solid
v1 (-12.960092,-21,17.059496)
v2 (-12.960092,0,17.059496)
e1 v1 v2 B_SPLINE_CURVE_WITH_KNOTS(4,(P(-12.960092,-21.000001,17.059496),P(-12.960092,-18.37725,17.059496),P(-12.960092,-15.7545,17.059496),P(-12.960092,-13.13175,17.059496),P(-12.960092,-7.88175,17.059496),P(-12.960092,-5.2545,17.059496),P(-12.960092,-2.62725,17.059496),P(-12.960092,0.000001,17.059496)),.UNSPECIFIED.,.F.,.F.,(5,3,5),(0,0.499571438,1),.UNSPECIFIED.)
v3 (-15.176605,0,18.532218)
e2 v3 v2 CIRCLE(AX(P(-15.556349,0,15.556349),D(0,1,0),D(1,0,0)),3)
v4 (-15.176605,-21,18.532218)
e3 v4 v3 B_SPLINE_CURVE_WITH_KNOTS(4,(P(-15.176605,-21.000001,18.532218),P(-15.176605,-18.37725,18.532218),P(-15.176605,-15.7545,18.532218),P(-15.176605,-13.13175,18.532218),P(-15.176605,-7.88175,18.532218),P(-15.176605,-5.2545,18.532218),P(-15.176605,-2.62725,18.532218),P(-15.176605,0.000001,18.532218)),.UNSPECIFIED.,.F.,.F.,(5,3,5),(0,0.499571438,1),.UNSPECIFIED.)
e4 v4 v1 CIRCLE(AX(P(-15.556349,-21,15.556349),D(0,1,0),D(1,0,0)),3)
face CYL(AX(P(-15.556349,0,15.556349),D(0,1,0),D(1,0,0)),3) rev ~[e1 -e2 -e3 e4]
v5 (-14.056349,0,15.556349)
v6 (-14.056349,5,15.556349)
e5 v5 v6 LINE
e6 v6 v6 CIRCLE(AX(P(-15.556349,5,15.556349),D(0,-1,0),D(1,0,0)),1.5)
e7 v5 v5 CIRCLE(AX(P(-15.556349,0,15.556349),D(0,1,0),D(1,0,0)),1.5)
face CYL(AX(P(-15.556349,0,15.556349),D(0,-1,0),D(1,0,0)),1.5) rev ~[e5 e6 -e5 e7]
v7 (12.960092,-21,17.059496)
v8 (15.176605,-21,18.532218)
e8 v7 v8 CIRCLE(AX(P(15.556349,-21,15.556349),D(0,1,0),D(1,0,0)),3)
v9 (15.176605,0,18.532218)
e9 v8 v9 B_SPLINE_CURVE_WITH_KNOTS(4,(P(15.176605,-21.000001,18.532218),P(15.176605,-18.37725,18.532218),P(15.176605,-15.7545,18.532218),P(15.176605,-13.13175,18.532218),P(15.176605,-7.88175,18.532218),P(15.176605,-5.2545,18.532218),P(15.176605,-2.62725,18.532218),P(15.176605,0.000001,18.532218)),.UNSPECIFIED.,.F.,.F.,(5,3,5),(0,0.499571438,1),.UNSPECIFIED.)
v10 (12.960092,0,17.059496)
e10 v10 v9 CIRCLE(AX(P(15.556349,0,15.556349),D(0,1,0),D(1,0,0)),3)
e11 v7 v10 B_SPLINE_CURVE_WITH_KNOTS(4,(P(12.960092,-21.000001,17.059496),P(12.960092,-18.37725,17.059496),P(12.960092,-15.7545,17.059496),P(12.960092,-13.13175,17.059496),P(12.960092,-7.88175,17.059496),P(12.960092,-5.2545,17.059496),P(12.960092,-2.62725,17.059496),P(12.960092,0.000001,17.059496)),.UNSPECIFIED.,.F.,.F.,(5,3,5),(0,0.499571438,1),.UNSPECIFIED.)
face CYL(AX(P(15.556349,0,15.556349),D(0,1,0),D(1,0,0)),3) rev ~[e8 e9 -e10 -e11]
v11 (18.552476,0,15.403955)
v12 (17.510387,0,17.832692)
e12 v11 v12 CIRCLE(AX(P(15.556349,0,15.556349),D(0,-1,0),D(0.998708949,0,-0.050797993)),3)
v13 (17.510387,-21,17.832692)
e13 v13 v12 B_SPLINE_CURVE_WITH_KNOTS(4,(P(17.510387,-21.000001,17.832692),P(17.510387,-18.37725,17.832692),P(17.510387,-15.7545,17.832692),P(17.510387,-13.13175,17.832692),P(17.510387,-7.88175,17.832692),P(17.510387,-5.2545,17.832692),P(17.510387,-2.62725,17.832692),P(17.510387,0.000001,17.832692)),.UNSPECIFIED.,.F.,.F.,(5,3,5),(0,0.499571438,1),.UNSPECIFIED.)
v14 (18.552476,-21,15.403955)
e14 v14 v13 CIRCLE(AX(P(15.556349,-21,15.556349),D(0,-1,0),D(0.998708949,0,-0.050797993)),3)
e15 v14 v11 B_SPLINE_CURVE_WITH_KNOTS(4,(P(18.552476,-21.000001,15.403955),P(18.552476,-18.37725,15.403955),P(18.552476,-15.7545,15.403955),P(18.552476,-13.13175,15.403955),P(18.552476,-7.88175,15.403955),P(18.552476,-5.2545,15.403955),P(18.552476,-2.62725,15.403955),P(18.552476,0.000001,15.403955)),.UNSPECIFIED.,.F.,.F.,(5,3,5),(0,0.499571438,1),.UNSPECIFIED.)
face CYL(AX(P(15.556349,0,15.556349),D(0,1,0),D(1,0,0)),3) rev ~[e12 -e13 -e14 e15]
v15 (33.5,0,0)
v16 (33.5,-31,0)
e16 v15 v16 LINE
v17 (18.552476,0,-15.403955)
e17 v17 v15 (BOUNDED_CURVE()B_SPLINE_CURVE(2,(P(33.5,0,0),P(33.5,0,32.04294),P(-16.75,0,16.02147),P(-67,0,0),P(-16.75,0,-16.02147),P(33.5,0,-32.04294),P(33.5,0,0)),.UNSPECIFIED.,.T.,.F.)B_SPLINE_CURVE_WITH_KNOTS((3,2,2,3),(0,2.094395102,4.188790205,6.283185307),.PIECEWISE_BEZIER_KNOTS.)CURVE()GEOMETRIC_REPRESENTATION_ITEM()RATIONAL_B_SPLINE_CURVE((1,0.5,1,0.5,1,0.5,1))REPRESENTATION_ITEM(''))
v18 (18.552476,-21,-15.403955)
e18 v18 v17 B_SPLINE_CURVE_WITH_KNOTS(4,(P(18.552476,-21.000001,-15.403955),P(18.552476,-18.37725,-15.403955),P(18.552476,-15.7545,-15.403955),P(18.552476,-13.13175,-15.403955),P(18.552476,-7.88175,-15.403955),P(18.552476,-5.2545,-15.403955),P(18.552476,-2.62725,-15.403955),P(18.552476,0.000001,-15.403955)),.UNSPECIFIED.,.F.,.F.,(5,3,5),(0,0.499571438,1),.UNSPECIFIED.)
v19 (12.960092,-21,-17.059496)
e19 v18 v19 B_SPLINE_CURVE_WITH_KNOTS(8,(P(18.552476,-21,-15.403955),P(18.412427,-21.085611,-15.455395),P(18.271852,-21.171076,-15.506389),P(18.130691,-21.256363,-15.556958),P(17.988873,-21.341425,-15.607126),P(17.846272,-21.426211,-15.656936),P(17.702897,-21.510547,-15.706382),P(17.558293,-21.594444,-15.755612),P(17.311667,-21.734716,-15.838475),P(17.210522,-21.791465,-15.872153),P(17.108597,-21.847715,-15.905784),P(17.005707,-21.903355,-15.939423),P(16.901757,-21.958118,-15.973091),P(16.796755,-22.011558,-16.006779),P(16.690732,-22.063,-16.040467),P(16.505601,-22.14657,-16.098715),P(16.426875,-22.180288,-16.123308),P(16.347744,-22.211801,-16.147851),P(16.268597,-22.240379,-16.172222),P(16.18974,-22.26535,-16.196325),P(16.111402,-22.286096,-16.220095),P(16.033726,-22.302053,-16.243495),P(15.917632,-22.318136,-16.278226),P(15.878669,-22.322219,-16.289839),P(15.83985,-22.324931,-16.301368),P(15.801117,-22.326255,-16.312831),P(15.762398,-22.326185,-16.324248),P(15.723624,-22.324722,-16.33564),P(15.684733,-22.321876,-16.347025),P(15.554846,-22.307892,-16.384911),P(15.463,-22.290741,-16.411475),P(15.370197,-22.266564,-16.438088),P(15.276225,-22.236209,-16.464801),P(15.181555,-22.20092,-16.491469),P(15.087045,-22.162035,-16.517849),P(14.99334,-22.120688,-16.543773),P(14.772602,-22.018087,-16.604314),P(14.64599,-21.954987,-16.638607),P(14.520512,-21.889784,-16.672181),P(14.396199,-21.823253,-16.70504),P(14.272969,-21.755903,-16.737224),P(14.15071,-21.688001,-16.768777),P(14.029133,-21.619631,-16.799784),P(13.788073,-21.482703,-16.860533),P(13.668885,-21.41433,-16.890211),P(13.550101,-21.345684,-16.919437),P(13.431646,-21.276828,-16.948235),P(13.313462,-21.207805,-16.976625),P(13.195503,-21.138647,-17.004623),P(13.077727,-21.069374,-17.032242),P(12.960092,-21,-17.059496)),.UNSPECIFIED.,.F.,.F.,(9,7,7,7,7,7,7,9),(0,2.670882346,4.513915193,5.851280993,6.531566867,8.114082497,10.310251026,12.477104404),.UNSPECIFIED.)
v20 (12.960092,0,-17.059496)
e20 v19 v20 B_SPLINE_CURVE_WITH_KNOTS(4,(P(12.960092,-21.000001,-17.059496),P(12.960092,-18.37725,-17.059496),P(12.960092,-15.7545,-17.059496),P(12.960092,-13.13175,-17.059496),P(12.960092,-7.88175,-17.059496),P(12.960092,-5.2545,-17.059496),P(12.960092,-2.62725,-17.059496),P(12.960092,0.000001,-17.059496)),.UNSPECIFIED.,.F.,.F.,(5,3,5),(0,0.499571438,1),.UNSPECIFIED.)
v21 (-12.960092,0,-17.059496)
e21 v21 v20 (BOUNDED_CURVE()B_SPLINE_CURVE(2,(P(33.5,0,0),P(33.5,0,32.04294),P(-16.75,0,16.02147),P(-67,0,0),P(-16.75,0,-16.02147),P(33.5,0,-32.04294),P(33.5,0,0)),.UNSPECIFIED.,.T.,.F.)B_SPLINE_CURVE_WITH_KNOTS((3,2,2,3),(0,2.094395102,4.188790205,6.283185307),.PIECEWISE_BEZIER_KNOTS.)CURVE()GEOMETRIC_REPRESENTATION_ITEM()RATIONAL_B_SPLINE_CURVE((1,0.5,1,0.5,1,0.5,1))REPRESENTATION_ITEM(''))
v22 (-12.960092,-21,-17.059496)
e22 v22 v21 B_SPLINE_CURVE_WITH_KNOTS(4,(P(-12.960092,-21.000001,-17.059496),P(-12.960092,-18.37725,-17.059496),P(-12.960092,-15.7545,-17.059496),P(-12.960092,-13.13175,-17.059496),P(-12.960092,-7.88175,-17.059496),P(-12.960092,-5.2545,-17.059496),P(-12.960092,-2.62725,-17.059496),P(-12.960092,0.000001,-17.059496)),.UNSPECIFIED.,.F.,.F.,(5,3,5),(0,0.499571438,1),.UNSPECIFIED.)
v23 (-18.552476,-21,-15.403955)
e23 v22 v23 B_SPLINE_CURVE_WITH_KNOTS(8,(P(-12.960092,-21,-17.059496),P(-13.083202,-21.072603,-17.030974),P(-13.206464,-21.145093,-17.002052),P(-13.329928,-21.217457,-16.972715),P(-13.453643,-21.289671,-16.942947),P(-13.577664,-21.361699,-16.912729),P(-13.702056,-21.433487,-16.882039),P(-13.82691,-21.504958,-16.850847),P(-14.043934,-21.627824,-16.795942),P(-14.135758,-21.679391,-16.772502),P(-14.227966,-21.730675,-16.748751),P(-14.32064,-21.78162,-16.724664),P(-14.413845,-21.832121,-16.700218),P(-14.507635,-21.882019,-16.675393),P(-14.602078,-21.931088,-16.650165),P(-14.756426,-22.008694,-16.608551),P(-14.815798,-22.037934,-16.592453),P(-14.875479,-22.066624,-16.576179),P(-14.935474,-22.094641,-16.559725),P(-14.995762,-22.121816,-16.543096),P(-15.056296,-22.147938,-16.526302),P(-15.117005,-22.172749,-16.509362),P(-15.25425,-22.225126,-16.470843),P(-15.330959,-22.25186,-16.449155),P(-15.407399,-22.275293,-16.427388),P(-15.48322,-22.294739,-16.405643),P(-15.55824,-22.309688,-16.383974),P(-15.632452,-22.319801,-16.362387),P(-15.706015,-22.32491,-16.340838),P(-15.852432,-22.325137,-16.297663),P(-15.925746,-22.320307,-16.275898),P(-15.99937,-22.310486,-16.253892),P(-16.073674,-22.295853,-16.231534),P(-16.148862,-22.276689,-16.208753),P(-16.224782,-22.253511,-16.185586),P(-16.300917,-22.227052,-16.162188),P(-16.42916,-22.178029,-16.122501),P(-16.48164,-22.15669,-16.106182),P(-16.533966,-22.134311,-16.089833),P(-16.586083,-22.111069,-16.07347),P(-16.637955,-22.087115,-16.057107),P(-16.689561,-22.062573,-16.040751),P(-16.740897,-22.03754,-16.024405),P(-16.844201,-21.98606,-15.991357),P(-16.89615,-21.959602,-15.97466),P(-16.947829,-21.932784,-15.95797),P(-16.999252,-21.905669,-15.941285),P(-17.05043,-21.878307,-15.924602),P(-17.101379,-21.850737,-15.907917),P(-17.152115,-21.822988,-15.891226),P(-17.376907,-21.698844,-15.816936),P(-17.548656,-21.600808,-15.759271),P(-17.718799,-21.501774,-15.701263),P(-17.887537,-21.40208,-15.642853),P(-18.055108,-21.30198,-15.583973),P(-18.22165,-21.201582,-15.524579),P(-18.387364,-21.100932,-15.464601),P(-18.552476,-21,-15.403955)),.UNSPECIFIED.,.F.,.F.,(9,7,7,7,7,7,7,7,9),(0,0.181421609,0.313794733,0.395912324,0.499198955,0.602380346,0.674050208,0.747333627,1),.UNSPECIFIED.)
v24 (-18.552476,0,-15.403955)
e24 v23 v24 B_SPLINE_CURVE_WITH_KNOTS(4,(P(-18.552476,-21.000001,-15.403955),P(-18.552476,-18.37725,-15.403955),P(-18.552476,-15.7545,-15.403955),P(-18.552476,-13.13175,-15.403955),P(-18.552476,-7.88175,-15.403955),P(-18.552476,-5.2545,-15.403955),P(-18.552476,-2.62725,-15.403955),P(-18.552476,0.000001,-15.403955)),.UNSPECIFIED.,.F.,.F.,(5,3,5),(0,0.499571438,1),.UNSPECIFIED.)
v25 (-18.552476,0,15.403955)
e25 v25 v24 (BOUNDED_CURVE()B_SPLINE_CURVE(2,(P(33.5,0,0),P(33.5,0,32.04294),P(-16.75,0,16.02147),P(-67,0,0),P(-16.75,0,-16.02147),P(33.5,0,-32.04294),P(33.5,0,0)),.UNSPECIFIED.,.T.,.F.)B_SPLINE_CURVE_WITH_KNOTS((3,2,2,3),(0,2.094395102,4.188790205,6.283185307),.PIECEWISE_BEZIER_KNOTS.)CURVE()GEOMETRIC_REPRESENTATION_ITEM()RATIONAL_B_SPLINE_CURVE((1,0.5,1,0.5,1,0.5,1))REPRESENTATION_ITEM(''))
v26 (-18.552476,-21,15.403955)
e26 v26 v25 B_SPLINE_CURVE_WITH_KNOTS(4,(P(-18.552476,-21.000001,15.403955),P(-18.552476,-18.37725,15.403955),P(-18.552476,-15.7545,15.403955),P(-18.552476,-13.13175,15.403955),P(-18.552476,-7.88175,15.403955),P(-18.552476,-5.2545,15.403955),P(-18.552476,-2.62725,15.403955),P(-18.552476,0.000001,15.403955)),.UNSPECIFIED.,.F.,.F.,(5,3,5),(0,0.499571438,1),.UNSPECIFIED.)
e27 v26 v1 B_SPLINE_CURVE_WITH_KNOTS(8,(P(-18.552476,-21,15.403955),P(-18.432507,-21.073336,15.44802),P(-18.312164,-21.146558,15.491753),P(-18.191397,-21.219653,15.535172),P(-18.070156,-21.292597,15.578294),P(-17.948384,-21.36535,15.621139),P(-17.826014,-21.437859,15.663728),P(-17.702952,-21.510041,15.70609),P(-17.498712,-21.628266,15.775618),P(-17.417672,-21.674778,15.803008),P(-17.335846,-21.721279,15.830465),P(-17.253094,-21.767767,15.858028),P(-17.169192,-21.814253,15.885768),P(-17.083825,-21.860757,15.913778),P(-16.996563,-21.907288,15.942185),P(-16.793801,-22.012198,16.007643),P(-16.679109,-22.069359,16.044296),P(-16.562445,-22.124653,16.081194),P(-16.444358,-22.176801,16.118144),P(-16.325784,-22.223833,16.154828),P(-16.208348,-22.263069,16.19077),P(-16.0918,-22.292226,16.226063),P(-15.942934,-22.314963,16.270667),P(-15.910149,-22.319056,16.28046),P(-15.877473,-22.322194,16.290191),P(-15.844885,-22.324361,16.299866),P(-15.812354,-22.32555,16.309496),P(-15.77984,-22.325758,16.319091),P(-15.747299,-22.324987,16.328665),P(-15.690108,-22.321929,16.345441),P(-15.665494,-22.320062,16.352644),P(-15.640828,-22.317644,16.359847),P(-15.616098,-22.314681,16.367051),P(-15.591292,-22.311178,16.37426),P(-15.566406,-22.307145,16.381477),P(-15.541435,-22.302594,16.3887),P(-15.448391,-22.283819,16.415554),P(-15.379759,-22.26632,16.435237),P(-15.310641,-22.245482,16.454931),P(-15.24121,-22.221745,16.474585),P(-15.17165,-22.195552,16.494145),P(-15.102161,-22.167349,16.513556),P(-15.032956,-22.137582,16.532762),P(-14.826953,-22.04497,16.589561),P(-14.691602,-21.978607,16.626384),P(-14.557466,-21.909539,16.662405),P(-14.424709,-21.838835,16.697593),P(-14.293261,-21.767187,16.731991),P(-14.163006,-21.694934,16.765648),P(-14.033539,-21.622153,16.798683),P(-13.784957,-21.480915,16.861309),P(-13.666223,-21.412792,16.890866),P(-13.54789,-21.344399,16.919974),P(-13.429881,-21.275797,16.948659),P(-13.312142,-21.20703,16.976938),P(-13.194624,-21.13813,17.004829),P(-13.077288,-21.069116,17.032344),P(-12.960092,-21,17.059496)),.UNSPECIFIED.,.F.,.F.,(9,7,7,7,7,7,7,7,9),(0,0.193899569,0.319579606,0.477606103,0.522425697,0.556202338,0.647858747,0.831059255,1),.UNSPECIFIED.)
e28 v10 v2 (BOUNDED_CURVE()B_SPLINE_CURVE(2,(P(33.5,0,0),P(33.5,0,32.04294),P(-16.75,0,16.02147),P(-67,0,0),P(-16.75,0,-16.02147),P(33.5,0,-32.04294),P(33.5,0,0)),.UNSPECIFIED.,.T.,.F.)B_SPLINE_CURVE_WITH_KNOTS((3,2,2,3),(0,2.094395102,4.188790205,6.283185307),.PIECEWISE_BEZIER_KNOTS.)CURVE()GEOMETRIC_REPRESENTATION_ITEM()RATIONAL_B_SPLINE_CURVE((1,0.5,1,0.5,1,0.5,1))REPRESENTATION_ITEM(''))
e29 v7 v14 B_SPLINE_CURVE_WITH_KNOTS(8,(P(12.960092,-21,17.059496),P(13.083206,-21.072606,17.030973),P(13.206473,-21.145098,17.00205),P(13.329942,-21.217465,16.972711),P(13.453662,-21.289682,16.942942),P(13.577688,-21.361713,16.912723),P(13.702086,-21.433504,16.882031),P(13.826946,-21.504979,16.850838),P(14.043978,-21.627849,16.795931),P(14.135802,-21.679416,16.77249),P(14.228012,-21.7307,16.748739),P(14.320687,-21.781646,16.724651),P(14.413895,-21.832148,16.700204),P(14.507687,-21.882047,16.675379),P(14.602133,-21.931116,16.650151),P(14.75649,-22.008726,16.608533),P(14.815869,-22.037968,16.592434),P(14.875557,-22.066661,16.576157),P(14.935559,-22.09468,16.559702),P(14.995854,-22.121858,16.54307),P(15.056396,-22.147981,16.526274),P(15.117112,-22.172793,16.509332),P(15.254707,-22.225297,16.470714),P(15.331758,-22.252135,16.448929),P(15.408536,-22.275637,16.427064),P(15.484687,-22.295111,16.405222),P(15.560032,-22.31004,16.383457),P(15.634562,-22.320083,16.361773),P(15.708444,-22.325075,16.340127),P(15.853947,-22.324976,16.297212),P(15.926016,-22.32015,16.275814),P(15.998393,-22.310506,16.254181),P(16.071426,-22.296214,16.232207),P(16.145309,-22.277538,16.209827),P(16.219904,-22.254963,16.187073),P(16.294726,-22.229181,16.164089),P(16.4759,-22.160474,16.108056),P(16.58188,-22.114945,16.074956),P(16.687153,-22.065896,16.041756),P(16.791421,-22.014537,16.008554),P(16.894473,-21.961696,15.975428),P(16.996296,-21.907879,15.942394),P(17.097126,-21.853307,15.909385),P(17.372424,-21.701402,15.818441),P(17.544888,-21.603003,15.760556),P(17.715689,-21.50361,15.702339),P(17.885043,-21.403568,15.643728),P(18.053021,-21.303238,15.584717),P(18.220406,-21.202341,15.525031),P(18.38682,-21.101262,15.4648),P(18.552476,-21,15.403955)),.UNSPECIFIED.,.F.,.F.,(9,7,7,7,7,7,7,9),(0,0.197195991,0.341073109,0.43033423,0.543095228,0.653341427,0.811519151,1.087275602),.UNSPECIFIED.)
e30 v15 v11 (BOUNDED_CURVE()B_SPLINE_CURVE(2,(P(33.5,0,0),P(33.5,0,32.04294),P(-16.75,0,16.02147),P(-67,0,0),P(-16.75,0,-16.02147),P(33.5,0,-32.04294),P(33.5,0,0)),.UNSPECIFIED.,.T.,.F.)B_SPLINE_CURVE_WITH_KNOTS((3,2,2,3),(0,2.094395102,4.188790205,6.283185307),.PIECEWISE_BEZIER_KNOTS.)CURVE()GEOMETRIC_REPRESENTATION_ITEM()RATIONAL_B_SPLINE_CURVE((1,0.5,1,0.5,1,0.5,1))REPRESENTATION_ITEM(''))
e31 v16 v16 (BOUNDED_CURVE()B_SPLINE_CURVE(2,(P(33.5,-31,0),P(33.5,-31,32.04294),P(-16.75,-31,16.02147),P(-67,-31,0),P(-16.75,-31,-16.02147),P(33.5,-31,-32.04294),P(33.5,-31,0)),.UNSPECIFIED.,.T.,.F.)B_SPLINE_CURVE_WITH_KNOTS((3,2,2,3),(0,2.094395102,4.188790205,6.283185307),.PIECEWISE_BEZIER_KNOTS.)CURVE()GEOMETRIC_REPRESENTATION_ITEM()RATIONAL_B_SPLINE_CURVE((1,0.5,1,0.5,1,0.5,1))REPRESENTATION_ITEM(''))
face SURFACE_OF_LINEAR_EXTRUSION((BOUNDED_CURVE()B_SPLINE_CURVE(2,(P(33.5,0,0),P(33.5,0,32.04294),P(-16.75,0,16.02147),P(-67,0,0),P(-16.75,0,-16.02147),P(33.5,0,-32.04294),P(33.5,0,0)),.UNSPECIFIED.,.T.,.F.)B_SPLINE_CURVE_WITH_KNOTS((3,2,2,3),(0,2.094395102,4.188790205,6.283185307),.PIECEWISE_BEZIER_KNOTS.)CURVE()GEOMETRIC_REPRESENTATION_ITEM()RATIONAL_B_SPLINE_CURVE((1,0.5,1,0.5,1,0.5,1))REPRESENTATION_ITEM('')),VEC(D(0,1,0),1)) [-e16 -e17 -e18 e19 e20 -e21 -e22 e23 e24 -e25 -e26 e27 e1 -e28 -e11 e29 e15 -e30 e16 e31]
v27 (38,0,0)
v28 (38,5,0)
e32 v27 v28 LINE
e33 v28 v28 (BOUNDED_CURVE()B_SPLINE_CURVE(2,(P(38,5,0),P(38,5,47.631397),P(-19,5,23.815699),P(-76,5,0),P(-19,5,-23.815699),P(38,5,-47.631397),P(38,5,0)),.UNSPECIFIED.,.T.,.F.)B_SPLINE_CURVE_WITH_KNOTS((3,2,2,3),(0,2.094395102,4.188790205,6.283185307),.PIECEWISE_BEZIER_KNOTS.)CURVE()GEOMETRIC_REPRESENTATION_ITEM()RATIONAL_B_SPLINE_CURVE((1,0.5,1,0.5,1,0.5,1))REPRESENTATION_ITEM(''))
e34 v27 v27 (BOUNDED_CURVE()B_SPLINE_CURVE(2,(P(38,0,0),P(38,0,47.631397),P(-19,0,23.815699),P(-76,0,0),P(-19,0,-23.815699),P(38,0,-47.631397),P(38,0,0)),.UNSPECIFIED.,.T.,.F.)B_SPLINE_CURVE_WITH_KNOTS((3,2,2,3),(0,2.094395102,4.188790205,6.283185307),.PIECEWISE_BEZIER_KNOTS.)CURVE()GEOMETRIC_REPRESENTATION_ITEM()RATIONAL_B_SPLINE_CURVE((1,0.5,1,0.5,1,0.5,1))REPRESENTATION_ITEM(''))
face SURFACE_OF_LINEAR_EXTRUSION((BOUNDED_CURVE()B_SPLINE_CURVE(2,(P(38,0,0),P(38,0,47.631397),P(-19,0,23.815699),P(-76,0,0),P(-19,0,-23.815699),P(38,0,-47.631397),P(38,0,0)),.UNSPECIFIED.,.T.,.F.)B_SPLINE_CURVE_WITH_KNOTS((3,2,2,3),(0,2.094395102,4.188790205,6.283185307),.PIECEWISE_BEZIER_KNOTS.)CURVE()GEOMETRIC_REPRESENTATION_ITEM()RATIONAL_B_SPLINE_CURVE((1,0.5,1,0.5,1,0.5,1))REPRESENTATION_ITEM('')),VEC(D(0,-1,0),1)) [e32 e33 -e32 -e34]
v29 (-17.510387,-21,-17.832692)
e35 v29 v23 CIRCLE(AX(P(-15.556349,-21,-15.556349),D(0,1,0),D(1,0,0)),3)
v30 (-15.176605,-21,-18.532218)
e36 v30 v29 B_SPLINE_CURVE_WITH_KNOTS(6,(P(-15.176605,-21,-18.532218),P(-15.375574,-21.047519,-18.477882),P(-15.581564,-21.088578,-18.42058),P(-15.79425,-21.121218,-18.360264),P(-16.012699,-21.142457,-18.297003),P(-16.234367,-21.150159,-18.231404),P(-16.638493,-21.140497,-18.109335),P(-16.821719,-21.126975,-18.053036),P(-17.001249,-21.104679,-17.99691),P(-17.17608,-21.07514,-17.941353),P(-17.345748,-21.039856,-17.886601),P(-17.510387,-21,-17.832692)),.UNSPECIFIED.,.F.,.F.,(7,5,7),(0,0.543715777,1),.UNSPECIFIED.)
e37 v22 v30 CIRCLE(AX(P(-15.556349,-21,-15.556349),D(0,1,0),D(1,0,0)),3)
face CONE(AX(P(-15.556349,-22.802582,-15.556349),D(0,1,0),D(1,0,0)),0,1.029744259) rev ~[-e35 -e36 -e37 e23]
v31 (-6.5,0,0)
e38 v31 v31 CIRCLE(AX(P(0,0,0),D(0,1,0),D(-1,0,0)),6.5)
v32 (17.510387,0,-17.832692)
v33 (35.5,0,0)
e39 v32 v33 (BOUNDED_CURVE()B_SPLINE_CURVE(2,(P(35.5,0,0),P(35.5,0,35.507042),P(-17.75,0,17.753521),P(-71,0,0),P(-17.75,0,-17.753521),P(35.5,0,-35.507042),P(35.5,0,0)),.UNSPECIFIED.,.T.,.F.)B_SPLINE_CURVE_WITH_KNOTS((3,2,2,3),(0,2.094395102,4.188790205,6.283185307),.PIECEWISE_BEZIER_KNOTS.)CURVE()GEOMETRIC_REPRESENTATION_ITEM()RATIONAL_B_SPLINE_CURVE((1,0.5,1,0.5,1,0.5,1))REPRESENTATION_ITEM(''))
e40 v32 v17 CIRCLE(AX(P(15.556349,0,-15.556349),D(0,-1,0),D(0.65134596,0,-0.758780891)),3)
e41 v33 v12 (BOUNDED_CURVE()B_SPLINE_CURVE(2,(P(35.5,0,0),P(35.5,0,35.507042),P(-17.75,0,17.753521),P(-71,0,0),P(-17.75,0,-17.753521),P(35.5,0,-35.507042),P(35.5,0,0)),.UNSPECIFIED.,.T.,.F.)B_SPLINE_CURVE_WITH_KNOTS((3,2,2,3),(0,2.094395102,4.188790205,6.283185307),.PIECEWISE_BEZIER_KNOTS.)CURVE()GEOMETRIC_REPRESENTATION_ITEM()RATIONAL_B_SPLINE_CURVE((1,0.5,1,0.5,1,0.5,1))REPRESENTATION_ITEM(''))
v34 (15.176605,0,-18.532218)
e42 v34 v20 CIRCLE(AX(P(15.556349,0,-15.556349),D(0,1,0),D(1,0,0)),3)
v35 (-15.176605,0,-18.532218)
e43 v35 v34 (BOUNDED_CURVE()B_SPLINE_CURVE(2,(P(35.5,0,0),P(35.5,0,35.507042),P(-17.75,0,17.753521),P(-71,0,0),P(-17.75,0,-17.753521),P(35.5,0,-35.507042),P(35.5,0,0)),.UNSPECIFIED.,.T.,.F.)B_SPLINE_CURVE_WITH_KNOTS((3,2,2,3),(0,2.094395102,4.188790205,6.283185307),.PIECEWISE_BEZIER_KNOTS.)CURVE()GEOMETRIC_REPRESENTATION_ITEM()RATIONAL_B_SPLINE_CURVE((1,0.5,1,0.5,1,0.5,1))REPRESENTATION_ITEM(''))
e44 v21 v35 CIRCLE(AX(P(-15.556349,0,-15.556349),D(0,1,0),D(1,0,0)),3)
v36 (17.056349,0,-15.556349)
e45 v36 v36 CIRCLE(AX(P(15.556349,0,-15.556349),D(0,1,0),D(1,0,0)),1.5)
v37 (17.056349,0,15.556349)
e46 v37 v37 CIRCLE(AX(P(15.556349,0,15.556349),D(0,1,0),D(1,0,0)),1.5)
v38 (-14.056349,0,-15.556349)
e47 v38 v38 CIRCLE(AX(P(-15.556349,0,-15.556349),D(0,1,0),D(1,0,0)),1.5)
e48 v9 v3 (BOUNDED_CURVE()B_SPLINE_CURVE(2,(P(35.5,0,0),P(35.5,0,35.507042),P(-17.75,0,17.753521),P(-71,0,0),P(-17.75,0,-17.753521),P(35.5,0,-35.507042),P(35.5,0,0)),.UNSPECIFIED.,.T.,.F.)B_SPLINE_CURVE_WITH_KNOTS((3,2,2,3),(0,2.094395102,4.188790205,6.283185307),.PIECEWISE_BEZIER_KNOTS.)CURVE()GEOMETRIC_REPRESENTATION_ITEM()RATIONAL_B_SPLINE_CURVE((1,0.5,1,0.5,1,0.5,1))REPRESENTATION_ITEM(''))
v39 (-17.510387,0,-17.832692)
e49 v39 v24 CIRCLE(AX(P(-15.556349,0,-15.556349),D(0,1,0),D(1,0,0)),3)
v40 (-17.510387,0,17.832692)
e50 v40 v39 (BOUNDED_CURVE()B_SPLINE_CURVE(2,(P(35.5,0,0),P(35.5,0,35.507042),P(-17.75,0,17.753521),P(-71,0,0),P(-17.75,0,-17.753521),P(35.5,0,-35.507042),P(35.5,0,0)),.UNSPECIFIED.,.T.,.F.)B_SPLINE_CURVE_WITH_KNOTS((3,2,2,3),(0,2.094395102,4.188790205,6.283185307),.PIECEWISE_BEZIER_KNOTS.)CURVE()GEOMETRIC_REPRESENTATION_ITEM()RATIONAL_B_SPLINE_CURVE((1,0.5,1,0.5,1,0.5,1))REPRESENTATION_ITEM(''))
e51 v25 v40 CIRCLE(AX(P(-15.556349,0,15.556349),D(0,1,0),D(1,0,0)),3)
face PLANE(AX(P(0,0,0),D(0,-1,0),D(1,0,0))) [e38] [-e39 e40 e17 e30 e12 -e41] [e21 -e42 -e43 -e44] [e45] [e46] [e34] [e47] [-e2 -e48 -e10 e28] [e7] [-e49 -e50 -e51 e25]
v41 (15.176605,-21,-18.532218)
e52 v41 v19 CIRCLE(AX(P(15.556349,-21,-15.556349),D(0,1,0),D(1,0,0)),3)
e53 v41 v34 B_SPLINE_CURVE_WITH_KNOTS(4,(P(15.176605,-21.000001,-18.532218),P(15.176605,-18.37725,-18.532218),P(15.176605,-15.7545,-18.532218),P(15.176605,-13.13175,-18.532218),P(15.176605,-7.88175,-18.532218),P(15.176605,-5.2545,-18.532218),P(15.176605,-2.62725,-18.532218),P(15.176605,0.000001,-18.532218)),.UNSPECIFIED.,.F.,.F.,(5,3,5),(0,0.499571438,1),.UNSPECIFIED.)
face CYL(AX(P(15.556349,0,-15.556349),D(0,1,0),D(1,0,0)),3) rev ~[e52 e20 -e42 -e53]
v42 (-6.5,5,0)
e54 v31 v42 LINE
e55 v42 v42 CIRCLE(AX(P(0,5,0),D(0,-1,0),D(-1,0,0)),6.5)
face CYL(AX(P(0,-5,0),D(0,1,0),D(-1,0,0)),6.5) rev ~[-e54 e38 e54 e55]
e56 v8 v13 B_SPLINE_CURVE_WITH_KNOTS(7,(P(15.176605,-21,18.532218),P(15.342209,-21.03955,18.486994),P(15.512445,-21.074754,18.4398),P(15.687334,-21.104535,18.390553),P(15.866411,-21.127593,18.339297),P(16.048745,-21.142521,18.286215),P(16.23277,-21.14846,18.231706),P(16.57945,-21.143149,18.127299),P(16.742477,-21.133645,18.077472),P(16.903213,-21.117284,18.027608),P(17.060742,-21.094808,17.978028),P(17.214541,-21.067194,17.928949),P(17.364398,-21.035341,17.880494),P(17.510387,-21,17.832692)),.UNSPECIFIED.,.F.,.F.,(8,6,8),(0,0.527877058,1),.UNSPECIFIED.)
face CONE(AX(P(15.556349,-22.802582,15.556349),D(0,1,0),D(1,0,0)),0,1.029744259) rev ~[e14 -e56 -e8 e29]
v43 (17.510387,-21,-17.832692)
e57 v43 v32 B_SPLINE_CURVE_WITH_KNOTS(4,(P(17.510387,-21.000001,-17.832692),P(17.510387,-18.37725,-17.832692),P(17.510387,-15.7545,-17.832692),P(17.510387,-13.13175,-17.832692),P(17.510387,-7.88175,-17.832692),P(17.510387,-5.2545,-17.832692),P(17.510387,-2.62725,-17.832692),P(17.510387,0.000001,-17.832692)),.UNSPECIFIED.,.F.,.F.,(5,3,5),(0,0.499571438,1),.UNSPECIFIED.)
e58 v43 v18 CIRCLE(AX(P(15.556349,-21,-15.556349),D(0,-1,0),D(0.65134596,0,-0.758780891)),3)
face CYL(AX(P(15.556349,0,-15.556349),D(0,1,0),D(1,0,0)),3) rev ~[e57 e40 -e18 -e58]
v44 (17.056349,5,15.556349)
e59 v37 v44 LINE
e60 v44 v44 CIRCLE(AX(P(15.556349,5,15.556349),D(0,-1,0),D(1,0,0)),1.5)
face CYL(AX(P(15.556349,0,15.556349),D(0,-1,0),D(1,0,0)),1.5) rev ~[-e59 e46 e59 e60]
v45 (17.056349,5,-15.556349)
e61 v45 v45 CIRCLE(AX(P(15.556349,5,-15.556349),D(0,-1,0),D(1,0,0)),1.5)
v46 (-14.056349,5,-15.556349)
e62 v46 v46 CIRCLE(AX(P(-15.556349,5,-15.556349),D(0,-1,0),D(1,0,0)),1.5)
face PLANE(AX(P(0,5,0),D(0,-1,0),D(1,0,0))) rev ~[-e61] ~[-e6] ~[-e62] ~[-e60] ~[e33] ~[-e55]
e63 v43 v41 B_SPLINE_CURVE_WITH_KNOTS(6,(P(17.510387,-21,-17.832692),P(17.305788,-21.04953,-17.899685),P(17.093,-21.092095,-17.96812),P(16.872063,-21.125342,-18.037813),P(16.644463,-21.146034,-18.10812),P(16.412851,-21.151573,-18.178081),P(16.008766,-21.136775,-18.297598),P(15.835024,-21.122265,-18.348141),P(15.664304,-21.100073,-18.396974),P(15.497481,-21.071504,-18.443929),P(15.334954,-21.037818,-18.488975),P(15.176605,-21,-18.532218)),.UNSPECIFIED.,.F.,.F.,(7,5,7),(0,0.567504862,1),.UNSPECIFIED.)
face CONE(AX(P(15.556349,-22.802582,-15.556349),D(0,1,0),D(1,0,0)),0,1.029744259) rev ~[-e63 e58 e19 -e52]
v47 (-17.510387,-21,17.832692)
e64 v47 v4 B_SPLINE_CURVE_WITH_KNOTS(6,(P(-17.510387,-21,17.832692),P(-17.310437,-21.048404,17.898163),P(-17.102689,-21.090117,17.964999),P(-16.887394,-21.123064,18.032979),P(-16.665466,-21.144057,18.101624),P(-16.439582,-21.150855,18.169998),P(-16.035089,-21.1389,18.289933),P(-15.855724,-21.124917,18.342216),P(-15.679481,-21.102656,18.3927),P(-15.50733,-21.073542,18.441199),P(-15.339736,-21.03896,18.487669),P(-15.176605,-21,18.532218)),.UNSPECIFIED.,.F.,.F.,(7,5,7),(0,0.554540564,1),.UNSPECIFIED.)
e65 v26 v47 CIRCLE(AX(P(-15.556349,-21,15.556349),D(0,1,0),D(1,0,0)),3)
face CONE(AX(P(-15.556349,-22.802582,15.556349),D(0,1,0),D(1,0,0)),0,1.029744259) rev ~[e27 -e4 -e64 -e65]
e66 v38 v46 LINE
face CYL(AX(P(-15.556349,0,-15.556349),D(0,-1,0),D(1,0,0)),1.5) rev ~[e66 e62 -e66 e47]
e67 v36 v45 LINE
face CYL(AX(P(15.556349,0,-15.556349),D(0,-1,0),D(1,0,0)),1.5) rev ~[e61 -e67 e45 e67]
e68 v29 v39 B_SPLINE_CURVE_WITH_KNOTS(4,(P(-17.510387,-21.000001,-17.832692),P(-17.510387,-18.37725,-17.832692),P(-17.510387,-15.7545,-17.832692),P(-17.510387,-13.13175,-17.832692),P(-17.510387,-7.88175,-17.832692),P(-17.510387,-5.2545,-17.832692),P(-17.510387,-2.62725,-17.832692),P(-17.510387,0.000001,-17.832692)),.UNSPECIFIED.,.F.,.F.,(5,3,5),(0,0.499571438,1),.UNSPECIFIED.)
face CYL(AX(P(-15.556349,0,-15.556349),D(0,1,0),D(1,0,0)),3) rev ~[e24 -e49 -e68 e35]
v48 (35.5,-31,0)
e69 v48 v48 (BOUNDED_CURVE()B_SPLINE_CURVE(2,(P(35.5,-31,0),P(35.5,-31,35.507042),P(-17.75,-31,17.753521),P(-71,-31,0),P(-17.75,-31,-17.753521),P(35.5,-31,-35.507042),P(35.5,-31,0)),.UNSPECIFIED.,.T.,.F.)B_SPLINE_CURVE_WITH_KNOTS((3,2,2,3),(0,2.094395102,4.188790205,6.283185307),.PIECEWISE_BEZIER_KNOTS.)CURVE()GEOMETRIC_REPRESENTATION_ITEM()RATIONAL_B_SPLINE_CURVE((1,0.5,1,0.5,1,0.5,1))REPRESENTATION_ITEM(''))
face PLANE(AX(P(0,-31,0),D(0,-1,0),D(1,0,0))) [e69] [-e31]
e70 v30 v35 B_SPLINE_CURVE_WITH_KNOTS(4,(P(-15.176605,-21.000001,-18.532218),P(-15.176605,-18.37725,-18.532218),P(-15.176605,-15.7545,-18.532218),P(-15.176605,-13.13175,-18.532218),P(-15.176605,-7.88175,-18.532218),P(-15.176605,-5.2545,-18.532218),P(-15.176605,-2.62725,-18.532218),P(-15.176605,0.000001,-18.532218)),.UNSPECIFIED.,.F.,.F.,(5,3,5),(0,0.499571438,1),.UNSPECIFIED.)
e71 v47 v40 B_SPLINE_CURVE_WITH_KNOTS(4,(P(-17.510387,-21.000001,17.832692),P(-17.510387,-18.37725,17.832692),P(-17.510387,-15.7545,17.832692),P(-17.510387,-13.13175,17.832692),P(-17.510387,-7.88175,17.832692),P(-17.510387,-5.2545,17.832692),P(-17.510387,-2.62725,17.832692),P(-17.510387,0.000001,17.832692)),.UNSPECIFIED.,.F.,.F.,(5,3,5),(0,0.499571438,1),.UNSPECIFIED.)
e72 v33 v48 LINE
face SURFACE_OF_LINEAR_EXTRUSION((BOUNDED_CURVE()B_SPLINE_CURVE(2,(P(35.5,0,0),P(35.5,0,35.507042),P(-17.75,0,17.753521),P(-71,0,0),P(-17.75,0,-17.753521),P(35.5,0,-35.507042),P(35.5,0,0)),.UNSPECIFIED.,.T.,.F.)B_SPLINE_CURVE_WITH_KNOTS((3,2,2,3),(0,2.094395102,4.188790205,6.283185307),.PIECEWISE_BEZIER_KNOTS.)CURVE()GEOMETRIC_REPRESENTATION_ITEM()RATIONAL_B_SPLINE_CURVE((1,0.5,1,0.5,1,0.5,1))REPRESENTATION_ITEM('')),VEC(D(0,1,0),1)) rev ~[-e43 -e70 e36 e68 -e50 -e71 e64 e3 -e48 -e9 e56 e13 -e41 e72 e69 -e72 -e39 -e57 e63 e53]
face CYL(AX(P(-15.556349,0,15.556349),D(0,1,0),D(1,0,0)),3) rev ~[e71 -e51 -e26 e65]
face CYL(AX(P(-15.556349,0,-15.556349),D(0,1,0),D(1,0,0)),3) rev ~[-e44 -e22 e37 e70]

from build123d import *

# Parameters (mm, degrees)
F1_DEPTH = 31
F3_DEPTH = 5
F4_D     = 13
F4_DEPTH = 5
F4_TIP   = 3.9055940237
F6_D     = 3
F6_DEPTH = 5
F6_TIP   = 0.9012909285
F7_D     = 6
F7_DEPTH = 21
F7_TIP   = 1.8025818571


# Not quite as in the source:
# - a feature names something its author has since deleted; it is built from what else it names


with BuildPart() as f1:
    # F0 (on Front) → F1 (new body)
    with BuildSketch(Plane.XZ):
        with BuildLine():
            add(Edge.make_bspline(
                [(35.5, 0), (35.5, 35.5070415552), (-17.75, 17.7535207776), (-71, 0), (-17.75, -17.7535207776), (35.5, -35.5070415552), (35.5, 0)],
                knots=[0, 0, 0, 2.0943951024, 2.0943951024, 4.1887902048, 4.1887902048, 6.2831853072, 6.2831853072, 6.2831853072], degree=2, weights=[1, 0.5, 1, 0.5, 1, 0.5, 1]))
        make_face()
        with BuildLine():
            add(Edge.make_bspline(
                [(33.5, 0), (33.5, 32.04293994), (-16.75, 16.02146997), (-67, 0), (-16.75, -16.02146997), (33.5, -32.04293994), (33.5, 0)],
                knots=[0, 0, 0, 2.0943951024, 2.0943951024, 4.1887902048, 4.1887902048, 6.2831853072, 6.2831853072, 6.2831853072], degree=2, weights=[1, 0.5, 1, 0.5, 1, 0.5, 1]))
        make_face(mode=Mode.SUBTRACT)
    extrude(amount=F1_DEPTH)

    # F2 (on Front) → F3 (join)
    with BuildSketch(Plane.XZ):
        with BuildLine():
            add(Edge.make_bspline(
                [(38, 0), (38, 47.6313972081), (-19, 23.8156986041), (-76, 0), (-19, -23.8156986041), (38, -47.6313972081), (38, 0)],
                knots=[0, 0, 0, 2.0943951024, 2.0943951024, 4.1887902048, 4.1887902048, 6.2831853072, 6.2831853072, 6.2831853072], degree=2, weights=[1, 0.5, 1, 0.5, 1, 0.5, 1]))
        make_face()
    extrude(amount=-F3_DEPTH)

    # F4
    with Locations(Plane.XZ):
        with Locations((0, 0)):
            Hole(F4_D / 2, depth=F4_DEPTH)
            with Locations((0, 0, -(F4_DEPTH + F4_TIP / 2))):  # 118° drill point
                Cone(0, F4_D / 2, F4_TIP, mode=Mode.SUBTRACT)

    # F6 (one way)
    with BuildSketch(Plane.XZ):
        with Locations((-15.5563491861, 15.5563491861), (15.5563491861, 15.5563491861), (-15.5563491861, -15.5563491861), (15.5563491861, -15.5563491861)):
            Circle(F6_D / 2)
    extrude(amount=-F6_DEPTH, mode=Mode.SUBTRACT)
    with Locations(Plane.XZ):
        with Locations((-15.5563491861, 15.5563491861), (15.5563491861, 15.5563491861), (-15.5563491861, -15.5563491861), (15.5563491861, -15.5563491861)):
            with Locations((0, 0, -(F6_DEPTH + F6_TIP / 2))):  # 118° drill point
                Cone(0, F6_D / 2, F6_TIP, mode=Mode.SUBTRACT)

    # F7 (one way)
    with BuildSketch(Plane(origin=(0, 0, 0), x_dir=(1, 0, 0), z_dir=(0, 1, 0))):
        with Locations((-15.5563491861, -15.5563491861), (15.5563491861, -15.5563491861), (15.5563491861, 15.5563491861), (-15.5563491861, 15.5563491861)):
            Circle(F7_D / 2)
    extrude(amount=-F7_DEPTH, mode=Mode.SUBTRACT)
    with Locations(Plane(origin=(0, 0, 0), x_dir=(1, 0, 0), z_dir=(0, 1, 0))):
        with Locations((-15.5563491861, -15.5563491861), (15.5563491861, -15.5563491861), (15.5563491861, 15.5563491861), (-15.5563491861, 15.5563491861)):
            with Locations((0, 0, -(F7_DEPTH + F7_TIP / 2))):  # 118° drill point
                Cone(0, F7_D / 2, F7_TIP, mode=Mode.SUBTRACT)


solid = f1.part
